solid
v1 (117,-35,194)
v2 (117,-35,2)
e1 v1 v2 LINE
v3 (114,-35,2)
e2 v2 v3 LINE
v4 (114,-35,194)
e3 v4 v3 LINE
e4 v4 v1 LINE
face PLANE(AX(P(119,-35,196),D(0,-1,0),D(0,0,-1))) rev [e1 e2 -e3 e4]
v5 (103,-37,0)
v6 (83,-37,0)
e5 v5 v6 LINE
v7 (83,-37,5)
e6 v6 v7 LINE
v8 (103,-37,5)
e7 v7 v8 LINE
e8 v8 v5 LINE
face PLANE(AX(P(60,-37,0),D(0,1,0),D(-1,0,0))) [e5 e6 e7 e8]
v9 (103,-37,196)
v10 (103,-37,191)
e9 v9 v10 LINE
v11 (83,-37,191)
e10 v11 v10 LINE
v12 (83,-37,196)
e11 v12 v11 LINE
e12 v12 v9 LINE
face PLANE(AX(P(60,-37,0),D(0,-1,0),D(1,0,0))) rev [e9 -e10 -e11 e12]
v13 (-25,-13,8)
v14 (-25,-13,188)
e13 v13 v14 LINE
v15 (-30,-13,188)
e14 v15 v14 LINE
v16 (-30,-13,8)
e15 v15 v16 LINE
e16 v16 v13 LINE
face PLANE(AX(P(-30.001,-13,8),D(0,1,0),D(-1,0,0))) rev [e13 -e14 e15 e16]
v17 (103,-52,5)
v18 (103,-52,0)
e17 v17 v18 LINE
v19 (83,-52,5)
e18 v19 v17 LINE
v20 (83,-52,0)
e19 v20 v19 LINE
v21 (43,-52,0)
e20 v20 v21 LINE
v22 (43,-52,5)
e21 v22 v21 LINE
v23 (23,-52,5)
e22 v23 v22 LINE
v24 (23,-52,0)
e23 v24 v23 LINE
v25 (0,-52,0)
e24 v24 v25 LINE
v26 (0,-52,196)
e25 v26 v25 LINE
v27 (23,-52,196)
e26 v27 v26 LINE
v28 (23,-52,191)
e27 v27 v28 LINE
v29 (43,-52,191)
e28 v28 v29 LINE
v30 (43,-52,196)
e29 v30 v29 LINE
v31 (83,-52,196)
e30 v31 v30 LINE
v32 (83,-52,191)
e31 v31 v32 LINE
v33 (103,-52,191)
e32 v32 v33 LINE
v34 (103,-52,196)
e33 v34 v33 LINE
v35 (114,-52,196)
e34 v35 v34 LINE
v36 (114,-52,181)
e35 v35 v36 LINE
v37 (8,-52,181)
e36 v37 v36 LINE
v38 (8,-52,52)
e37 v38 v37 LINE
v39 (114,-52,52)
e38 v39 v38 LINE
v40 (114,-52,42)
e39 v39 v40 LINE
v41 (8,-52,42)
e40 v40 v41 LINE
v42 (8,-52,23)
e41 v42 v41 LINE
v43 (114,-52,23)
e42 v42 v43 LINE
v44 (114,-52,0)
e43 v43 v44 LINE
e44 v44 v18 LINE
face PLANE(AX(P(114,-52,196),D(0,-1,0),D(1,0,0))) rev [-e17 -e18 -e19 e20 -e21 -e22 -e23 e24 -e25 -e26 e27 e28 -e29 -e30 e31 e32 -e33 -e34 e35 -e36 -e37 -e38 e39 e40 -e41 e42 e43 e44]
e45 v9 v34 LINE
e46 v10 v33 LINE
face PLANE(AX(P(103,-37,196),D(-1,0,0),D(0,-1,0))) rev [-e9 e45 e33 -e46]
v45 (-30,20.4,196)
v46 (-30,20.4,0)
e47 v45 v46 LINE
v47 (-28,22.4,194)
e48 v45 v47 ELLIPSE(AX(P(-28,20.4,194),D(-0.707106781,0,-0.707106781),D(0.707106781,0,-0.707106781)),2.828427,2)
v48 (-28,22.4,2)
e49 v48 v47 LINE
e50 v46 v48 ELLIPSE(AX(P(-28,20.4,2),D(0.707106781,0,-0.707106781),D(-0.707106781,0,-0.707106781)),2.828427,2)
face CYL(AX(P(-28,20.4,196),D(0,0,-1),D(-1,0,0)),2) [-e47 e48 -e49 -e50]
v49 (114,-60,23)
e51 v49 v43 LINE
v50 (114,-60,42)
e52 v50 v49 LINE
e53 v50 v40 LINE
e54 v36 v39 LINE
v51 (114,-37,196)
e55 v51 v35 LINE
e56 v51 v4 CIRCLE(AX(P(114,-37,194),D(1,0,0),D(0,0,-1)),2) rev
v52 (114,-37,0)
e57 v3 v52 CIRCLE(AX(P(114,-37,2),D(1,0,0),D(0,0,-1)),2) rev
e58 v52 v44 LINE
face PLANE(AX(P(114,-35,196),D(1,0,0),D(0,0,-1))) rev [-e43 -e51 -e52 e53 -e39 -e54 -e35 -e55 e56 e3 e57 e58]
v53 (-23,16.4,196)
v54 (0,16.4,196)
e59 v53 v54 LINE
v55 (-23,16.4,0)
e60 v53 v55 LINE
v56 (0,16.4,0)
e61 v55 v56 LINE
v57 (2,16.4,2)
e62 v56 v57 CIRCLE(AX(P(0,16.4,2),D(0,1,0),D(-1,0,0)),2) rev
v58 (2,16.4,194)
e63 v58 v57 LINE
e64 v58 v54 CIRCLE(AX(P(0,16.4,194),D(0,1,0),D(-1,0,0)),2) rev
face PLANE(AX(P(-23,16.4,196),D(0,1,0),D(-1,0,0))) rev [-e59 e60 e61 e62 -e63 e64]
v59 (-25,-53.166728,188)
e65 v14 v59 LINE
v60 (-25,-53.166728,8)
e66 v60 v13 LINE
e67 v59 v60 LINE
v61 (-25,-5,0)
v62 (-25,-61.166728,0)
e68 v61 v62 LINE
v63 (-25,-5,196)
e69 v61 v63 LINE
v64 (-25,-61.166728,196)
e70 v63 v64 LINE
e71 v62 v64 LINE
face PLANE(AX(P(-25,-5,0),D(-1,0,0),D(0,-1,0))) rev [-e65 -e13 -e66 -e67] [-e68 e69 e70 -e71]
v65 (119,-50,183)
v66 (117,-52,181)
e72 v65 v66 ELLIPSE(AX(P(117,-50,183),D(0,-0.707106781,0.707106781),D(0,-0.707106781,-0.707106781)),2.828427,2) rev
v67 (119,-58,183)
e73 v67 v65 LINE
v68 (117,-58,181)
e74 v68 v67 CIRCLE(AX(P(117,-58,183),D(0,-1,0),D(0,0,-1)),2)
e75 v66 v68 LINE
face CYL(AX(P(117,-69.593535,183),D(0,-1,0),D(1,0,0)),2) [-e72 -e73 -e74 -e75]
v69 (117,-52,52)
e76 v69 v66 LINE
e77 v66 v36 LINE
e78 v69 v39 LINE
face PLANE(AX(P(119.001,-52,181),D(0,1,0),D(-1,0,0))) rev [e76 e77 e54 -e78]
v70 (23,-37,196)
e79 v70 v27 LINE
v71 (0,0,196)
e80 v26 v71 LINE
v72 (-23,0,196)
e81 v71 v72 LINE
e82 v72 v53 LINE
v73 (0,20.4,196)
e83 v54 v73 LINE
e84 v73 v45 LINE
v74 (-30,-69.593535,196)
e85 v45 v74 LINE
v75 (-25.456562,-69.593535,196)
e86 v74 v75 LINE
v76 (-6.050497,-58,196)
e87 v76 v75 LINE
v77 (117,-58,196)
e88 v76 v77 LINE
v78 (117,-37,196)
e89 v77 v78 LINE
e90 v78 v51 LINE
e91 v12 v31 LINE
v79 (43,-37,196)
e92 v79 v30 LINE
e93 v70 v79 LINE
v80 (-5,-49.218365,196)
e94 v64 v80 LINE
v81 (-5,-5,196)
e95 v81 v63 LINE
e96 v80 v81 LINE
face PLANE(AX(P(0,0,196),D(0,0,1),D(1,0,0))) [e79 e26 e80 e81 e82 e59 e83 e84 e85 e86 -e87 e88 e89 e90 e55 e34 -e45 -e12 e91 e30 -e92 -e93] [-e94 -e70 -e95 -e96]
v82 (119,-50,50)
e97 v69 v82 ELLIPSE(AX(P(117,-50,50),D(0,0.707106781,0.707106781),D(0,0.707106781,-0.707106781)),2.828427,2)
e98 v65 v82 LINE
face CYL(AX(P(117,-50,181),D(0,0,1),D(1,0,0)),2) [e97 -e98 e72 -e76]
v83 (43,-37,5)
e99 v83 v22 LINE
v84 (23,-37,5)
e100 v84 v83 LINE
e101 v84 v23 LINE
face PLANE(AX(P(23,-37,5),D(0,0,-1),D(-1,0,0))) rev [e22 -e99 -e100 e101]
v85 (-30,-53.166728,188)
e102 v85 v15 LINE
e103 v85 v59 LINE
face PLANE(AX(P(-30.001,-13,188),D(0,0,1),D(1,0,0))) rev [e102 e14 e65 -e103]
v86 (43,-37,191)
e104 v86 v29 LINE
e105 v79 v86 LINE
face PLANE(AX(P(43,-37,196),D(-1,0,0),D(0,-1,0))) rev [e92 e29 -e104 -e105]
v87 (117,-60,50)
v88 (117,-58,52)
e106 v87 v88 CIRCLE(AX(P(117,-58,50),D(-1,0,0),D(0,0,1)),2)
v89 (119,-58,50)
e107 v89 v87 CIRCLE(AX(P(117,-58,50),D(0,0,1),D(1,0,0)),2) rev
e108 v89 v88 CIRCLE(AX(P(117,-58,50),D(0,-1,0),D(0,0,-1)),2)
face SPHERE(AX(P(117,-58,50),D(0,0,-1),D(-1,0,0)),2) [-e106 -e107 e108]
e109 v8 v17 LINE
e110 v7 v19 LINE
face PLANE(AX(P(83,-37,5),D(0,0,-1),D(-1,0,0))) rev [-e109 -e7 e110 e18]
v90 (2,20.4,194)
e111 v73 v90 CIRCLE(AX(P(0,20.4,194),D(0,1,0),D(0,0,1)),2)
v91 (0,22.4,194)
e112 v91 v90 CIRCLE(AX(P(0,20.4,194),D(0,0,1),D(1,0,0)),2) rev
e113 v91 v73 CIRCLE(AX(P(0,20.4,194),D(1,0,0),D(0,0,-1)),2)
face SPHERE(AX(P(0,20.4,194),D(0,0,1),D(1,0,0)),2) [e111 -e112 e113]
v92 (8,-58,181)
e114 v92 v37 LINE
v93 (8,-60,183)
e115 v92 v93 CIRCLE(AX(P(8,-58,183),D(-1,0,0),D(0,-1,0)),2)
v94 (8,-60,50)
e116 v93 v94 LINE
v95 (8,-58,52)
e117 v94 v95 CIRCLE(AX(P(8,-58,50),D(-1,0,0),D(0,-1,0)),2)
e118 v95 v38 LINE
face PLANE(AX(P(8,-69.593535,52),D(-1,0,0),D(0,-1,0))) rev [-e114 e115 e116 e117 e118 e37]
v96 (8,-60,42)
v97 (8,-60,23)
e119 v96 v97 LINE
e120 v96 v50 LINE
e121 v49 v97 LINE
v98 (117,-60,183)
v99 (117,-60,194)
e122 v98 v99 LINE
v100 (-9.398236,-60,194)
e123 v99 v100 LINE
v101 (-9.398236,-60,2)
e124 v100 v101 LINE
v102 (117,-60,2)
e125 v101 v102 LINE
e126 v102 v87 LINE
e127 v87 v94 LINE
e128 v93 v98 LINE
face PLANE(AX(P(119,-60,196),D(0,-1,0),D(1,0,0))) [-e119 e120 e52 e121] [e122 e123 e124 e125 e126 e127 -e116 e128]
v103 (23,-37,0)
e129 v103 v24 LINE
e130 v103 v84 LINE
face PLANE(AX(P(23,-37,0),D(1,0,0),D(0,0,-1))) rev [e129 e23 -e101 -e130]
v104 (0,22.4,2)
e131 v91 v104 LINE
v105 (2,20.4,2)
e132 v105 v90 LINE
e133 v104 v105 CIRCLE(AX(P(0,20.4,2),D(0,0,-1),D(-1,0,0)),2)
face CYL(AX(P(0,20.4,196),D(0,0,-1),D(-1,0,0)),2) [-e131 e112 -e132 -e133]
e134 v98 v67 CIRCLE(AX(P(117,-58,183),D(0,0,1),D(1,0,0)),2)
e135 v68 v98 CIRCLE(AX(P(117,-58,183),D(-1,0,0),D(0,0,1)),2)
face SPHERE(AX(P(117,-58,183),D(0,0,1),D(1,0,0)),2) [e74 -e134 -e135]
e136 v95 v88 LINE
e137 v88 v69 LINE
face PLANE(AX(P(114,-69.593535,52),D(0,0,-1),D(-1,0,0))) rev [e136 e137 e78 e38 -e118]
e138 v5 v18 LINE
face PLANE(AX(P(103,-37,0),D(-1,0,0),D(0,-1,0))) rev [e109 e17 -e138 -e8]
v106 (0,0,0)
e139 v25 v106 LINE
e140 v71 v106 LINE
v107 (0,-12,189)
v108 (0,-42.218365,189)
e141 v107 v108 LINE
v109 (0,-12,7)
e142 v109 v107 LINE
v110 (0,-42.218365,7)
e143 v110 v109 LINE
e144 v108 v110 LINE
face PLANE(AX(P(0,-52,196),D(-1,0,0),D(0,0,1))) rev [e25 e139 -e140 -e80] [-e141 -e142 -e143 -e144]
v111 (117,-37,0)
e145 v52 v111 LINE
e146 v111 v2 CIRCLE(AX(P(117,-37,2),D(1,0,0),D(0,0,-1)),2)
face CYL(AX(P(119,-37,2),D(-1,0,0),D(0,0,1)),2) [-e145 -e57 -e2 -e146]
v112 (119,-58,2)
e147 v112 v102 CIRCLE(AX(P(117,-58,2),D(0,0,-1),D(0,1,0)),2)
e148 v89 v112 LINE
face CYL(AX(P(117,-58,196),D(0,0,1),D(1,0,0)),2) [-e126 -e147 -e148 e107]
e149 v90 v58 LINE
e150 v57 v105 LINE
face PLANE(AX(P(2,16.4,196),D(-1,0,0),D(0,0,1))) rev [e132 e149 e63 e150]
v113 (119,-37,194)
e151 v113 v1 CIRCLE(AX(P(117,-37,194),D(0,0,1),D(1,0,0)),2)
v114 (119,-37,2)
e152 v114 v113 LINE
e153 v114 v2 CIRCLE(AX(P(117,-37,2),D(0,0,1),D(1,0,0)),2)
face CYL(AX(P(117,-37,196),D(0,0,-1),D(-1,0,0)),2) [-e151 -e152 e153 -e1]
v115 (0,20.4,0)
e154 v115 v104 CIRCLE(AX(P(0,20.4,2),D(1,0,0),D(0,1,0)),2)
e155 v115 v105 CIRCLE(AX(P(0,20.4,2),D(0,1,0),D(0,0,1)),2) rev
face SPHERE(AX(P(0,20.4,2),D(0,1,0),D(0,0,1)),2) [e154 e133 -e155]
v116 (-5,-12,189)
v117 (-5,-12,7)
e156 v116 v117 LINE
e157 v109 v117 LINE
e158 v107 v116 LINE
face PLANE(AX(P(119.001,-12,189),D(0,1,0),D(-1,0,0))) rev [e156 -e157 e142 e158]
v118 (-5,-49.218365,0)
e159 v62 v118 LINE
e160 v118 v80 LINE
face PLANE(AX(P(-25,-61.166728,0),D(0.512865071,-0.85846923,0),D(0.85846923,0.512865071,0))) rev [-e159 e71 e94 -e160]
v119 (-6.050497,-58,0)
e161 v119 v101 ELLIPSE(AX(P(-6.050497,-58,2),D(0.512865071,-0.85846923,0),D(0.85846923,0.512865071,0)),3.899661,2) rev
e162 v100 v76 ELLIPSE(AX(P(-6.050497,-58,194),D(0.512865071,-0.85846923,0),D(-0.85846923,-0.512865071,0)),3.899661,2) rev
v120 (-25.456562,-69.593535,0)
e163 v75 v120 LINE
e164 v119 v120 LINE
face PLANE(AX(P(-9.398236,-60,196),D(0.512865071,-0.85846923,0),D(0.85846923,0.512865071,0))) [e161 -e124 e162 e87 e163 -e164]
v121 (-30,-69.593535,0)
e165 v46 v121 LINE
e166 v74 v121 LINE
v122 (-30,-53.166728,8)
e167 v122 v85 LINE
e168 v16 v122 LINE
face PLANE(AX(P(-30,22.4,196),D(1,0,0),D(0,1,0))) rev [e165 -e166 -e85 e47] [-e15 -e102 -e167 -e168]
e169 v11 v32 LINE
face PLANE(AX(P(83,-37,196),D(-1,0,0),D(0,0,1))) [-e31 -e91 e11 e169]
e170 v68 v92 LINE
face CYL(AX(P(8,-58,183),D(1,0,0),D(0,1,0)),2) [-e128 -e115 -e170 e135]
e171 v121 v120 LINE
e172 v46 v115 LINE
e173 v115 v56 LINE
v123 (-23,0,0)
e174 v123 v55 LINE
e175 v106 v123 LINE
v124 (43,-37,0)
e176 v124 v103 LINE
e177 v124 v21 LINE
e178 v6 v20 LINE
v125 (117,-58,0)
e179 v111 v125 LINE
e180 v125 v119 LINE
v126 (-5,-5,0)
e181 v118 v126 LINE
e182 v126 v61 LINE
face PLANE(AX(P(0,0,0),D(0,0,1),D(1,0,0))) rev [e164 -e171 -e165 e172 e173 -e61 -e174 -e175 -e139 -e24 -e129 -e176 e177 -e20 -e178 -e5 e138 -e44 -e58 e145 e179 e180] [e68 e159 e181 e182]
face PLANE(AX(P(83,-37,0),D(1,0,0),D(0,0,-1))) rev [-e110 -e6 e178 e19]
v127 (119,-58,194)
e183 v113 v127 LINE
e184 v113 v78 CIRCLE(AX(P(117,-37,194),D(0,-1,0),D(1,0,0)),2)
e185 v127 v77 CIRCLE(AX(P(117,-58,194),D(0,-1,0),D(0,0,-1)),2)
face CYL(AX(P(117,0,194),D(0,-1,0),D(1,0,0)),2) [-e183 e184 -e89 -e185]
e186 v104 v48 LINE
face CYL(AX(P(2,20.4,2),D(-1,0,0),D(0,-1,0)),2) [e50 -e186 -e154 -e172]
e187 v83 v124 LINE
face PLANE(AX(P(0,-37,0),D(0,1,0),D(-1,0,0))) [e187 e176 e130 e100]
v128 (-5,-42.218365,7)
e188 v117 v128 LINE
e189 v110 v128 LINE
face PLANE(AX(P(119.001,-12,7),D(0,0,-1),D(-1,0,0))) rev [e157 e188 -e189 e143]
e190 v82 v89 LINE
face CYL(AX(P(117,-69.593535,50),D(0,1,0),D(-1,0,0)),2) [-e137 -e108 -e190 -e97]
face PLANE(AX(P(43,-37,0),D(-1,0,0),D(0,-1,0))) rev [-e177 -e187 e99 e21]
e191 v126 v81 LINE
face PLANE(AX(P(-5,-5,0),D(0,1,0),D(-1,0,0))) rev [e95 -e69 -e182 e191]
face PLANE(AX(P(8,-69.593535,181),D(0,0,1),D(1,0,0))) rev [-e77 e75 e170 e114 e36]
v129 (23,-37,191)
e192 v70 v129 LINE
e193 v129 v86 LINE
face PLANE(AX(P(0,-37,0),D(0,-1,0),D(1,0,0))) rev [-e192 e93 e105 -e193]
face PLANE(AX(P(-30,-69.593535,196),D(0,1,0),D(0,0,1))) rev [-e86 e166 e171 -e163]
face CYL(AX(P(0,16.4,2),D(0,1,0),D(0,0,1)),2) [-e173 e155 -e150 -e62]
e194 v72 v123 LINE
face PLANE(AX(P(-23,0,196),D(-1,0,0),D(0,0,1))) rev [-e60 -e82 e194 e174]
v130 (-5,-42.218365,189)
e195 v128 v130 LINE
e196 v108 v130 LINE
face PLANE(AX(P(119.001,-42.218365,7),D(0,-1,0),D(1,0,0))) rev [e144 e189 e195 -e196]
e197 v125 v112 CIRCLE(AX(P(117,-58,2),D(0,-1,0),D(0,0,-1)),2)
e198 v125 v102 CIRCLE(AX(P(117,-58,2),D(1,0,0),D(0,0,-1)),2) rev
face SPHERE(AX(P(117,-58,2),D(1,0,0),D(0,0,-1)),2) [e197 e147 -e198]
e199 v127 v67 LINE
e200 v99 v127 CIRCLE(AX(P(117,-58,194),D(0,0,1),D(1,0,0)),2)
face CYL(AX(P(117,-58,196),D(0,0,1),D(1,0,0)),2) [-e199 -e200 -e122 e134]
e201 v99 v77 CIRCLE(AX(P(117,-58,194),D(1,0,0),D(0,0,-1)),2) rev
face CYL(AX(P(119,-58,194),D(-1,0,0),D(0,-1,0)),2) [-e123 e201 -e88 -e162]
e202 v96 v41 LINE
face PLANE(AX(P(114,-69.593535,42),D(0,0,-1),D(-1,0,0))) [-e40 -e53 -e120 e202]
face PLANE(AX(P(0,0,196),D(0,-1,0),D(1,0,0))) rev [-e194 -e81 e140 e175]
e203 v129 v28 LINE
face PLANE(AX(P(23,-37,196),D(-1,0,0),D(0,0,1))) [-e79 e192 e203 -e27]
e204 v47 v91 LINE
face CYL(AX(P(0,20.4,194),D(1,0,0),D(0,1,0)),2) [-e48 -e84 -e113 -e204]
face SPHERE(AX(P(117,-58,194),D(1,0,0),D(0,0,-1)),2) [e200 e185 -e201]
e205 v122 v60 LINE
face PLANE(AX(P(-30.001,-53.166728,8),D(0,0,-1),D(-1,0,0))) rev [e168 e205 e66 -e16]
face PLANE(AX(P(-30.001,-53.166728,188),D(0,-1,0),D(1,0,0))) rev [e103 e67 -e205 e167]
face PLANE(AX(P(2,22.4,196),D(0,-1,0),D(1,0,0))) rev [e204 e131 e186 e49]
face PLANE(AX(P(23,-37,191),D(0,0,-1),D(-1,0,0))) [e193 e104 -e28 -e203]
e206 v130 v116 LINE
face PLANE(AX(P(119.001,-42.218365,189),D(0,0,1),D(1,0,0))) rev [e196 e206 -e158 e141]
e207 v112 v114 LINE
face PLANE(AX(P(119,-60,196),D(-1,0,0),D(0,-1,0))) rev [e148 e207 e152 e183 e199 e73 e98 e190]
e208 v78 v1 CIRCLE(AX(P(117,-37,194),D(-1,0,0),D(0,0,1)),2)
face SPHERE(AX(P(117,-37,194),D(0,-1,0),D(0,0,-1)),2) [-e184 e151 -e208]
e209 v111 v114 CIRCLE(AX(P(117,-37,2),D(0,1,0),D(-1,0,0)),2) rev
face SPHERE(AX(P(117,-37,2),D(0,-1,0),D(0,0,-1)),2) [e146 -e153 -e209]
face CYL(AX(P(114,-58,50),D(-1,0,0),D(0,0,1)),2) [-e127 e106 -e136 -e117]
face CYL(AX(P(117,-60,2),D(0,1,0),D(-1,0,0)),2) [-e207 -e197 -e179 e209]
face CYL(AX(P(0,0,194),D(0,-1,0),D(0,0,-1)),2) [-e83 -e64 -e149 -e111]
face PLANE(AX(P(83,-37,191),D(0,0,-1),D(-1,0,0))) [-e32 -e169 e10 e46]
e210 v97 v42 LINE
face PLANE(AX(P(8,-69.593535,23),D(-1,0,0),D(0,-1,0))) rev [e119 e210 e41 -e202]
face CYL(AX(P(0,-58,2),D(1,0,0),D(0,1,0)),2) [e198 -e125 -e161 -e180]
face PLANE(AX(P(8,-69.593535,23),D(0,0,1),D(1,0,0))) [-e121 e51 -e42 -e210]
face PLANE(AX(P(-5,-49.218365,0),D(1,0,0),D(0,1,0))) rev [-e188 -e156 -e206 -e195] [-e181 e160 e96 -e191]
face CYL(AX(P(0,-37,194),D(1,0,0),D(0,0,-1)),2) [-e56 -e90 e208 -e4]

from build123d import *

# Parameters (mm, degrees)
EXTRUDE_1_DEPTH        = 196
CUT_EXTRUDE_1_DEPTH    = 240.62524927
SKETCH_4_W             = 106
SKETCH_4_H             = 19
CUT_EXTRUDE_2_DEPTH    = 242.065053461
SKETCH_6_W             = 106
SKETCH_6_H             = 129
CUT_EXTRUDE_3_DEPTH    = 242.065053461
SKETCH_7_W             = 20
SKETCH_7_H             = 5
EXTRUDE_3_DEPTH        = 15
PATTERN_LINEAR_1_COUNT = 2
PATTERN_LINEAR_1_PITCH = 60
CUT_EXTRUDE_6_REACH    = 244.147
SKETCH_10_W            = 182
SKETCH_10_H            = 30.218365382
CUT_EXTRUDE_7_REACH    = 254.973
SKETCH_12_W            = 180
SKETCH_12_H            = 40.166727714
CUT_EXTRUDE_8_REACH    = 254.973
SKETCH_13_W            = 129
SKETCH_13_H            = 8
SKETCH_14_W            = 20
SKETCH_14_H            = 5
EXTRUDE_4_DEPTH        = 15
PATTERN_LINEAR_2_COUNT = 2
PATTERN_LINEAR_2_PITCH = 60
FILLET_1_R             = 2
FILLET_2_R             = 2
FILLET_3_R             = 2
FILLET_4_R             = 2


with BuildPart() as part:
    # 草图1 → 凸台-拉伸1 (new body)
    with BuildSketch(Plane.XY):
        Polygon((0, 0), (-23, 0), (-23, 16.4), (2, 16.4), (2, 22.4), (-30, 22.4), (-30, -69.593534811), (-25.456561805, -69.593534811), (-9.398235911, -60), (119, -60), (119, -35), (114, -35), (114, -52), (0, -52), align=None)
    extrude(amount=EXTRUDE_1_DEPTH)

    # 草图2 → 切除-拉伸1 (cut, through all)
    with BuildSketch(Plane.XY.offset(196)):
        Polygon((-25, -5), (-25, -61.166727714), (-5, -49.218365382), (-5, -5), align=None)
    extrude(amount=-CUT_EXTRUDE_1_DEPTH, mode=Mode.SUBTRACT)

    # 草图4 → 切除-拉伸2 (cut, through all)
    with BuildSketch(Plane(origin=(0, -52, 0), x_dir=(1, 0, 0), z_dir=(0, 1, 0))):
        with Locations((61, -32.5)):
            Rectangle(SKETCH_4_W, SKETCH_4_H)
    extrude(amount=-CUT_EXTRUDE_2_DEPTH, mode=Mode.SUBTRACT)

    # 草图6 → 切除-拉伸3 (cut, through all)
    with BuildSketch(Plane(origin=(0, -52, 0), x_dir=(1, 0, 0), z_dir=(0, 1, 0))):
        with Locations((61, -116.5)):
            Rectangle(SKETCH_6_W, SKETCH_6_H)
    extrude(amount=-CUT_EXTRUDE_3_DEPTH, mode=Mode.SUBTRACT)

    # 草图7 → 凸台-拉伸3 (add)
    with BuildSketch(Plane(origin=(0, -52, 0), x_dir=(1, 0, 0), z_dir=(0, 1, 0))):
        with Locations((33, -193.5)):
            Rectangle(SKETCH_7_W, SKETCH_7_H)
    extrude_3 = extrude(amount=EXTRUDE_3_DEPTH)

    # 阵列(线性)1: 凸台-拉伸3 ×2
    with Locations(*[(i * PATTERN_LINEAR_1_PITCH, 0, 0) for i in range(1, PATTERN_LINEAR_1_COUNT)]):
        add(extrude_3)

    # 草图10 → 切除-拉伸6 (cut, up to next)
    with BuildSketch(Plane.ZY.offset(5), mode=Mode.PRIVATE) as cut_extrude_6_sk1:
        with Locations((98, -27.109182691)):
            Rectangle(SKETCH_10_W, SKETCH_10_H)
    cut_extrude_6_tool1 = extrude(cut_extrude_6_sk1.sketch, amount=-CUT_EXTRUDE_6_REACH, mode=Mode.PRIVATE) & part.part
    add(cut_extrude_6_tool1.solids().sort_by_distance((-5, -27.109183, 98))[0], mode=Mode.SUBTRACT)

    # 草图12 → 切除-拉伸7 (cut, up to next)
    with BuildSketch(Plane(origin=(-25, 0, 0), x_dir=(0, 0, -1), z_dir=(1, 0, 0)), mode=Mode.PRIVATE) as cut_extrude_7_sk1:
        with Locations((-98, -33.083363857)):
            Rectangle(SKETCH_12_W, SKETCH_12_H)
    cut_extrude_7_tool1 = extrude(cut_extrude_7_sk1.sketch, amount=-CUT_EXTRUDE_7_REACH, mode=Mode.PRIVATE) & part.part
    add(cut_extrude_7_tool1.solids().sort_by_distance((-25, -33.083364, 98))[0], mode=Mode.SUBTRACT)

    # 草图13 → 切除-拉伸8 (cut, up to next)
    with BuildSketch(Plane.ZY.offset(-114), mode=Mode.PRIVATE) as cut_extrude_8_sk1:
        with Locations((116.5, -56)):
            Rectangle(SKETCH_13_W, SKETCH_13_H)
    cut_extrude_8_tool1 = extrude(cut_extrude_8_sk1.sketch, amount=-CUT_EXTRUDE_8_REACH, mode=Mode.PRIVATE) & part.part
    add(cut_extrude_8_tool1.solids().sort_by_distance((114, -56, 116.5))[0], mode=Mode.SUBTRACT)

    # 草图14 → 凸台-拉伸4 (add)
    with BuildSketch(Plane(origin=(0, -52, 0), x_dir=(1, 0, 0), z_dir=(0, 1, 0))):
        with Locations((33, -2.5)):
            Rectangle(SKETCH_14_W, SKETCH_14_H)
    extrude_4 = extrude(amount=EXTRUDE_4_DEPTH)

    # 阵列(线性)2: 凸台-拉伸4 ×2
    with Locations(*[(i * PATTERN_LINEAR_2_PITCH, 0, 0) for i in range(1, PATTERN_LINEAR_2_COUNT)]):
        add(extrude_4)

    # 圆角1
    fillet_1_edges = [part.edges().sort_by_distance(p)[0] for p in [
        (2, 19.4, 0),
        (-14, 22.4, 0),
        (2, 22.4, 98),
        (-30, 22.4, 98),
        (-14, 22.4, 196),
        (2, 19.4, 196),
    ]]
    fillet(fillet_1_edges, radius=FILLET_1_R)

    # 圆角2
    fillet_2_edges = [part.edges().sort_by_distance(p)[0] for p in [
        (119, -60, 26),
        (119, -47.5, 0),
        (54.800882044, -60, 0),
        (54.800882044, -60, 196),
        (119, -60, 188.5),
        (119, -47.5, 196),
    ]]
    fillet(fillet_2_edges, radius=FILLET_2_R)

    # 圆角3
    fillet_3_edges = [part.edges().sort_by_distance(p)[0] for p in [
        (119, -52, 116.5),
        (115.5, -35, 196),
        (115.5, -35, 0),
        (119, -35, 98),
        (118.414213562, -35, 0.585786438),
        (118.414213562, -35, 195.414213562),
    ]]
    fillet(fillet_3_edges, radius=FILLET_3_R)

    # 圆角4
    fillet_4_edges = [part.edges().sort_by_distance(p)[0] for p in [
        (62.5, -60, 52),
        (118.414213562, -59.414213562, 52),
        (62.5, -60, 181),
        (118.414213562, -59.414213562, 181),
        (119, -54, 52),
        (119, -54, 181),
    ]]
    fillet(fillet_4_edges, radius=FILLET_4_R - 0.0001)  # a hair under: the kernel refuses the full size


solid = part.part
